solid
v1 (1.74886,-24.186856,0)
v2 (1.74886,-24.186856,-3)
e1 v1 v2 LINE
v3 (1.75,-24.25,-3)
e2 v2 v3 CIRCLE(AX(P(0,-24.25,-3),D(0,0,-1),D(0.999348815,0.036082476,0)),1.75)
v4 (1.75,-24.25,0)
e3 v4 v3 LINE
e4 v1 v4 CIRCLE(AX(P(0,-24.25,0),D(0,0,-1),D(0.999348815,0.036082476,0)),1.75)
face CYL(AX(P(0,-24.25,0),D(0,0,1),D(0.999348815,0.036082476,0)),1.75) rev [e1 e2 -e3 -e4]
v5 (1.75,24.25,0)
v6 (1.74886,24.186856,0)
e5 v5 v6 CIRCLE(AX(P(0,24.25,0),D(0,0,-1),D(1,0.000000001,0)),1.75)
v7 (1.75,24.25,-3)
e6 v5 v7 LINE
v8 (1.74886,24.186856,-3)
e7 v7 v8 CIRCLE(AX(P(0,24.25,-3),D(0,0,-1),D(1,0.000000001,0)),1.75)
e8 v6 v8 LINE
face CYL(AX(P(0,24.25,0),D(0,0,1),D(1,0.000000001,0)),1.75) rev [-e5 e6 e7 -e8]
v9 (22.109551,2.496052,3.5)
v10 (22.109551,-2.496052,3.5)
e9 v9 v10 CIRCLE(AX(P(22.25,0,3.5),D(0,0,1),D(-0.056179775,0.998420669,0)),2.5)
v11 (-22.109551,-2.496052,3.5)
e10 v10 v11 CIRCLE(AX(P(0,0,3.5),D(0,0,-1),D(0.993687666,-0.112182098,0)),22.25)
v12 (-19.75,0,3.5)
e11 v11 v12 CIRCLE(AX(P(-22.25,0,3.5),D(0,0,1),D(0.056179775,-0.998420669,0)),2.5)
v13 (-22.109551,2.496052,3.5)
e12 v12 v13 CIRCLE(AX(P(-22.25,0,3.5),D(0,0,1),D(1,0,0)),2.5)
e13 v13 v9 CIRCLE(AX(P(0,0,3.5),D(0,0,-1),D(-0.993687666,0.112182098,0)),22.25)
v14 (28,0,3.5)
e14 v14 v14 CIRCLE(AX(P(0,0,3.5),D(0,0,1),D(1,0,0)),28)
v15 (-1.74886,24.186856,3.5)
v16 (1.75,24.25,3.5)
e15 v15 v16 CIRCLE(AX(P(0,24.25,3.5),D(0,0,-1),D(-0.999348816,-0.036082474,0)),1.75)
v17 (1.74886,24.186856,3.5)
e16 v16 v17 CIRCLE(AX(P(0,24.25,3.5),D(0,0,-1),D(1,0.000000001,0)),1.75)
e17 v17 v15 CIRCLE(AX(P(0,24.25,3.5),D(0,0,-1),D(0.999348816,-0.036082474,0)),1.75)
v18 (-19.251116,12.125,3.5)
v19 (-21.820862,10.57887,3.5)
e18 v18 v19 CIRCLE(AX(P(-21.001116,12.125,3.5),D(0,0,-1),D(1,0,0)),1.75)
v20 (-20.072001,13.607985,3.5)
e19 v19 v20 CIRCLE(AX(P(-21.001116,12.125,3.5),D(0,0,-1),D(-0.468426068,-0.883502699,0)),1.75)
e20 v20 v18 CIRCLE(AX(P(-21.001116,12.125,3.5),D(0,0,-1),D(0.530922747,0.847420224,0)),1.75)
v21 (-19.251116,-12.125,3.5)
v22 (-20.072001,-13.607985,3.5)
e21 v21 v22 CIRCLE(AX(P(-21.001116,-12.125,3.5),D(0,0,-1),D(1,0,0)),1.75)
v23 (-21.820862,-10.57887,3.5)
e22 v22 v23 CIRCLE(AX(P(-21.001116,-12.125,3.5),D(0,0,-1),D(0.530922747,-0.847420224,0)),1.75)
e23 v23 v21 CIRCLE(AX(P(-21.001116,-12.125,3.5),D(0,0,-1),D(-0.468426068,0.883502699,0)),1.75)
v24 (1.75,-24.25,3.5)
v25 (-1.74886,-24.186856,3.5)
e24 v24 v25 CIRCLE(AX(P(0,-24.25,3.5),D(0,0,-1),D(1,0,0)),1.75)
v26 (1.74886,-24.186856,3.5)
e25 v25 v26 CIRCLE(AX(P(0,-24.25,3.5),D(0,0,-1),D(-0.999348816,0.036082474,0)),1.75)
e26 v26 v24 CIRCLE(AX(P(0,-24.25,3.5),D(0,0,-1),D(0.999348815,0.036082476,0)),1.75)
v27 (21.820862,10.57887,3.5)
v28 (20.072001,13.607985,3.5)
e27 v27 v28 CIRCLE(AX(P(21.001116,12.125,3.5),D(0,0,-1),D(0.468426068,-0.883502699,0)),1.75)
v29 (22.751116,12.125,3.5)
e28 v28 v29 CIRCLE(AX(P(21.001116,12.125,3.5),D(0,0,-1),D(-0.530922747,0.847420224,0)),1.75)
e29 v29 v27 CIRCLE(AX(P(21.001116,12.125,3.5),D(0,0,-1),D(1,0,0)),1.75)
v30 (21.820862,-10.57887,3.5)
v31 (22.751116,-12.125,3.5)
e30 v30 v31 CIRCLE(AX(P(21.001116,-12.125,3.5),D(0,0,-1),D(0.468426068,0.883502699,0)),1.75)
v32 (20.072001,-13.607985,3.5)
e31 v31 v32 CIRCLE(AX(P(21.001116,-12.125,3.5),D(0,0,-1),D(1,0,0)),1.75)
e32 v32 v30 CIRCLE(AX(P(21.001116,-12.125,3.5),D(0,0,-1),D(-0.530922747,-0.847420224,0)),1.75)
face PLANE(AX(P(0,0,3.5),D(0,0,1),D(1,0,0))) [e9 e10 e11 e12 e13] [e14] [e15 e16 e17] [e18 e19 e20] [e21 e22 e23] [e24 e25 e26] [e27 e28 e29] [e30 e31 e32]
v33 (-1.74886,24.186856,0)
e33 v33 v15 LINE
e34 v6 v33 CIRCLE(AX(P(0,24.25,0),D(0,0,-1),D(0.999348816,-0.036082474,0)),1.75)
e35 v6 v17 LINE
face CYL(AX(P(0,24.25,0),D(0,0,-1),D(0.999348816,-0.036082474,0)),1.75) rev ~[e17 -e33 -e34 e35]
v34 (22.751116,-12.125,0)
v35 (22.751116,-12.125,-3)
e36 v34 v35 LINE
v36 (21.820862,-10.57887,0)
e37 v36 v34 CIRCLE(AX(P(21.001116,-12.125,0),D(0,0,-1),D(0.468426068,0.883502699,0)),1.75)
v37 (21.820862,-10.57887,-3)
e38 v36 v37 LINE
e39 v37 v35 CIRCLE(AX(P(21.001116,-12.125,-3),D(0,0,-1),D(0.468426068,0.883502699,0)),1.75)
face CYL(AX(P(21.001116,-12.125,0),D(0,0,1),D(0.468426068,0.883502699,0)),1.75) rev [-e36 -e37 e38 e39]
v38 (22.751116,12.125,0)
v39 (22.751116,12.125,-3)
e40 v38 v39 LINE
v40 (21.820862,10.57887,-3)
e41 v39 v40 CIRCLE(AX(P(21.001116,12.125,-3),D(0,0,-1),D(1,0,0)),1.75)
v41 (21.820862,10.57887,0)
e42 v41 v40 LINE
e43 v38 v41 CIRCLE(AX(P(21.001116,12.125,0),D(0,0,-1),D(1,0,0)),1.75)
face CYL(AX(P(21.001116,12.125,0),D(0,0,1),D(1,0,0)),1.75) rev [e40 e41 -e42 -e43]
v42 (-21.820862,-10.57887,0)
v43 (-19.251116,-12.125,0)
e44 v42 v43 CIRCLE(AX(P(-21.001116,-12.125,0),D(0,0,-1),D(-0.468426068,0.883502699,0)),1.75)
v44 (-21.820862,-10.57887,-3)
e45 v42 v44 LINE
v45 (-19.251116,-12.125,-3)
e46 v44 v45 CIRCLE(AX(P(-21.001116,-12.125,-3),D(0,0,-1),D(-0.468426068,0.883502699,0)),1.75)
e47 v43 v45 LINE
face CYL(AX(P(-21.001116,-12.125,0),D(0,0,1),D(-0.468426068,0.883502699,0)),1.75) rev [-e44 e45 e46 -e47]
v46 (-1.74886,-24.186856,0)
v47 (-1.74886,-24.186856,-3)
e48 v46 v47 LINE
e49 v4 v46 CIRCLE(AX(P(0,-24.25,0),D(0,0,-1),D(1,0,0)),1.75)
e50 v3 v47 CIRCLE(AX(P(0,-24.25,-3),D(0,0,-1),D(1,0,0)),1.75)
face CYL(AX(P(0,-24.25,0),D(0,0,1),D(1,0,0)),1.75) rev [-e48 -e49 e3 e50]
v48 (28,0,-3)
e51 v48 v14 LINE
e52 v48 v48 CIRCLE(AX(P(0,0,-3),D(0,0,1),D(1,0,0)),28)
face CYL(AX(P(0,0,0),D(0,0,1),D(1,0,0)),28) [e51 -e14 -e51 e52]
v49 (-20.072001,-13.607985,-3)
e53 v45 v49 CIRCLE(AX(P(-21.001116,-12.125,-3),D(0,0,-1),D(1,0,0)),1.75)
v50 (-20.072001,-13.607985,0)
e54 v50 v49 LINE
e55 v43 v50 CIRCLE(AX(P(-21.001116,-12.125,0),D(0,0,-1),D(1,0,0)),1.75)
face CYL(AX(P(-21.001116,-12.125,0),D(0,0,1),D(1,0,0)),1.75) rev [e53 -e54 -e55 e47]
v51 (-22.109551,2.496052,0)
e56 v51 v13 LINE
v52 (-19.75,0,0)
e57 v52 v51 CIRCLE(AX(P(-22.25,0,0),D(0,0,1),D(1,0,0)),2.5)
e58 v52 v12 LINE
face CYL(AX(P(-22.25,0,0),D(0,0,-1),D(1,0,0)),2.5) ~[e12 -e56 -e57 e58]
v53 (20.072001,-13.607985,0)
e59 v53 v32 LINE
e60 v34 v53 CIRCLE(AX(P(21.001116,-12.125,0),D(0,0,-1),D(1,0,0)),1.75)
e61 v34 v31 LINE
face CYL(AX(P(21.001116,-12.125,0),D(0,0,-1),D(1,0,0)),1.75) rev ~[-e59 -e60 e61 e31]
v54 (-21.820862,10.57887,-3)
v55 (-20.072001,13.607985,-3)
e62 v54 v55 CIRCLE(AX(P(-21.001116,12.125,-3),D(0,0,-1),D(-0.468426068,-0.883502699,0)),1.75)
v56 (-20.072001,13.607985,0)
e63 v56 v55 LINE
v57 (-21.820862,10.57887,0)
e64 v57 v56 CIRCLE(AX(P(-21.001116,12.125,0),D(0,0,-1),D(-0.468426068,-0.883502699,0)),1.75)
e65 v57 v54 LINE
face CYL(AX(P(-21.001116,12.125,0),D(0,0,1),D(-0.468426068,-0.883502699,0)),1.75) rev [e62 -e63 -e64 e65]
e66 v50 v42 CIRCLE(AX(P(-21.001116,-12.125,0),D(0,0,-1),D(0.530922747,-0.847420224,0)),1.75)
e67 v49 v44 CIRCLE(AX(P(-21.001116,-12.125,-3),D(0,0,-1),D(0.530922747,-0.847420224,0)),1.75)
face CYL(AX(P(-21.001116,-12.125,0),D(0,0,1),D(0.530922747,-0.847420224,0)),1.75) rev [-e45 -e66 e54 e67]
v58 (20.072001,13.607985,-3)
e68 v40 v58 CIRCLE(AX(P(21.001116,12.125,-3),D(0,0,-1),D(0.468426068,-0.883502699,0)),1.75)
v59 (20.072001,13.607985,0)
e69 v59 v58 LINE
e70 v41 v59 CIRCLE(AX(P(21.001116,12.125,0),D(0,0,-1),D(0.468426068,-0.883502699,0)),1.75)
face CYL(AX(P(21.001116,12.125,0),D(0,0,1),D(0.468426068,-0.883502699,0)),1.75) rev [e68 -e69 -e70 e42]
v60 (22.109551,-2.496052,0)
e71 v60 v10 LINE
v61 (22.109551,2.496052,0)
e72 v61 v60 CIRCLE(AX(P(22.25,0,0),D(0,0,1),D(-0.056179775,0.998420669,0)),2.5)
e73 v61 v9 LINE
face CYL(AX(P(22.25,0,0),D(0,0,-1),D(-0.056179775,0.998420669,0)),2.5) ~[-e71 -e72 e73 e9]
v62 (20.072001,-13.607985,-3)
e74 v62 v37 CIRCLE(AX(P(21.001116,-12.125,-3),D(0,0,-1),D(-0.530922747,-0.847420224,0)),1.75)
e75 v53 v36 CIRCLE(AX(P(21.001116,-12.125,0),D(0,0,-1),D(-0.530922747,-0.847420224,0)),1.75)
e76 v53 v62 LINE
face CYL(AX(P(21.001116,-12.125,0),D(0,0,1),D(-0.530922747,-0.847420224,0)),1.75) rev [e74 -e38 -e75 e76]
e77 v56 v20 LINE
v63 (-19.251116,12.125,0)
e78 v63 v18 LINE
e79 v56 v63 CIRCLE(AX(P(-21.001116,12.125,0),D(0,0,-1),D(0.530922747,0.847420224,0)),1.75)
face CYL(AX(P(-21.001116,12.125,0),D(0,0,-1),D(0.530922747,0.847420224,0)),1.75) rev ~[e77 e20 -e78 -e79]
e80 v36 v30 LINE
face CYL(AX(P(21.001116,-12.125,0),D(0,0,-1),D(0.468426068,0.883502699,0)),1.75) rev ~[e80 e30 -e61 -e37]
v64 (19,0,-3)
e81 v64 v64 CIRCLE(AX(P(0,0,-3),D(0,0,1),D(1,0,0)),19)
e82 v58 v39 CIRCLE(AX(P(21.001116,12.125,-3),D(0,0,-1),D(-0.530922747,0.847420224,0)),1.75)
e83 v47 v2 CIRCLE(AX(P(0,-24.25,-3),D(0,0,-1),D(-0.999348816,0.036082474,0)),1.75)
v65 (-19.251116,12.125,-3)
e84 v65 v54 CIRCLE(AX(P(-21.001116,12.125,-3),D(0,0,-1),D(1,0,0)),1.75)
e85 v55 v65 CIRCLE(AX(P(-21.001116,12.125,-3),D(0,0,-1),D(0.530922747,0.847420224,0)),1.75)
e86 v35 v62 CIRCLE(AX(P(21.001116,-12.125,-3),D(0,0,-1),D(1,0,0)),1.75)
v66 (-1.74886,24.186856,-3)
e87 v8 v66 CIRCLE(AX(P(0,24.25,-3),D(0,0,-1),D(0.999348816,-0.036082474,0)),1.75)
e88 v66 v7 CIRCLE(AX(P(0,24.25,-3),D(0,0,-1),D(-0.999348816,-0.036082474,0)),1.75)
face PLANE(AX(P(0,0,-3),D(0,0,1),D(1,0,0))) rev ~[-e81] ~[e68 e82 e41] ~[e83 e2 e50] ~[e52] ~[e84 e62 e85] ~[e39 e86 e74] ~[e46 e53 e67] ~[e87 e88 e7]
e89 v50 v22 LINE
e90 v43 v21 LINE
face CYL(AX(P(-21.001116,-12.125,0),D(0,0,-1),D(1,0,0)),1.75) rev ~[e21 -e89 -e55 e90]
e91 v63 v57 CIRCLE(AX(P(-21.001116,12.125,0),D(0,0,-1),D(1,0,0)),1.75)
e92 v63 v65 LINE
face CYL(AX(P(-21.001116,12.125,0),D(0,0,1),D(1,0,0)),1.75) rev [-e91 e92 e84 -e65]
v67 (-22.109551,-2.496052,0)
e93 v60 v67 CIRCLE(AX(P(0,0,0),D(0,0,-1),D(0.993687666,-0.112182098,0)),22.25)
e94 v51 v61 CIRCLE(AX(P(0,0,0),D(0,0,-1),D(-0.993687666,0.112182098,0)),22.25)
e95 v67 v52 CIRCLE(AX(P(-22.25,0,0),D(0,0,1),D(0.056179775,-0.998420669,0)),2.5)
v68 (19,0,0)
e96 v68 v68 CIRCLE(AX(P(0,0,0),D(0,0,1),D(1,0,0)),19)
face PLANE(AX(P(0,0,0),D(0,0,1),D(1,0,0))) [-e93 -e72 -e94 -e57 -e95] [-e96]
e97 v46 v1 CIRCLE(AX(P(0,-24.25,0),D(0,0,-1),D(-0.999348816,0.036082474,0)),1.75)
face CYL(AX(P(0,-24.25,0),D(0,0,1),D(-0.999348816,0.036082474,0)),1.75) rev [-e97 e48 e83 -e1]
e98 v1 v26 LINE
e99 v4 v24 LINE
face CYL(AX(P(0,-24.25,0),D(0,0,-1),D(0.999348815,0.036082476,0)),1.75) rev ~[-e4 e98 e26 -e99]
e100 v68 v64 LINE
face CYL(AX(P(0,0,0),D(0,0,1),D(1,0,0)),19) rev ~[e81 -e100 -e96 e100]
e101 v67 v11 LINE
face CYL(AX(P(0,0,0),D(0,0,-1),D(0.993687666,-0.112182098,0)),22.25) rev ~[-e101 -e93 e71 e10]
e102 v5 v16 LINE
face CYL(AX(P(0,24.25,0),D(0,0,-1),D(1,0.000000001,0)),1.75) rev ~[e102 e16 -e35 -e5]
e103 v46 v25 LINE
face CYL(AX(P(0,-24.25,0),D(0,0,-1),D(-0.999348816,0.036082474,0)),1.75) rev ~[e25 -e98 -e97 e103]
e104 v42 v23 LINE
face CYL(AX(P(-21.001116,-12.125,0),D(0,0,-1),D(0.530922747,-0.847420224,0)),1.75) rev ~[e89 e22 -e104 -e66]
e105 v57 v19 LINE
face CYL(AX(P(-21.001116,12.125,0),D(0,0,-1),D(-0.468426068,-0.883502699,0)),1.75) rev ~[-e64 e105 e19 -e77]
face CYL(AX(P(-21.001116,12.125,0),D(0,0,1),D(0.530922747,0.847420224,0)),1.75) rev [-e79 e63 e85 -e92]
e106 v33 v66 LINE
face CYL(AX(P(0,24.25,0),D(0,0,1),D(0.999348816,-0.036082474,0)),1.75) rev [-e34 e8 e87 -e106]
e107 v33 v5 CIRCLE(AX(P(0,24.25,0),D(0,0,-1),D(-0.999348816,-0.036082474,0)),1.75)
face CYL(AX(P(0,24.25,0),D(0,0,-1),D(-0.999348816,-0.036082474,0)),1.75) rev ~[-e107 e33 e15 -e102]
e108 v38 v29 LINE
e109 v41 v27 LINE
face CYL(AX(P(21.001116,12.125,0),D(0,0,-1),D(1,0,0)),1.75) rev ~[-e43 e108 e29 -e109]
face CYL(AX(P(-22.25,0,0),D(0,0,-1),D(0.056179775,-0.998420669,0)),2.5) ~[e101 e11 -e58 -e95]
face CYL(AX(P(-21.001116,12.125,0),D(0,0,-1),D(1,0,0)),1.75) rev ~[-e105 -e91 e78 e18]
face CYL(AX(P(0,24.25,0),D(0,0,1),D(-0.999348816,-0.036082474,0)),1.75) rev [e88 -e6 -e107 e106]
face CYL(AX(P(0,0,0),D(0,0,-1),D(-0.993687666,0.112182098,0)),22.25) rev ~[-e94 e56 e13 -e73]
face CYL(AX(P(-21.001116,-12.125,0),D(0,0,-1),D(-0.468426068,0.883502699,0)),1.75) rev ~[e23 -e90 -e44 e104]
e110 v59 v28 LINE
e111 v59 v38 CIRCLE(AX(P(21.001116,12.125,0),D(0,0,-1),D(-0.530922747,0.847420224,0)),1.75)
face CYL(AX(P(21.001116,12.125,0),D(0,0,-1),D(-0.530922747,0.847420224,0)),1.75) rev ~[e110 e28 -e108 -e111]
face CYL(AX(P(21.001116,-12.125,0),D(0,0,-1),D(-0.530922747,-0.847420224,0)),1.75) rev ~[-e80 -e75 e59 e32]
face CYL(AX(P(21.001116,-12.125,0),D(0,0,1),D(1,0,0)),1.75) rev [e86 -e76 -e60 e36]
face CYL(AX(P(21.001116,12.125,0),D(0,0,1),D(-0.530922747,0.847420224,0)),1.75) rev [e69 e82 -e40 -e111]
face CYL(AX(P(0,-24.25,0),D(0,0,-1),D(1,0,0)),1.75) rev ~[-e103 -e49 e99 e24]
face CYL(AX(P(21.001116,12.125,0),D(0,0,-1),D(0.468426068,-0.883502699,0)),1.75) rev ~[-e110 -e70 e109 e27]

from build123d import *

# Parameters (mm, degrees)
F0_R     = 28
F1_DEPTH = 3.5
F0_R_2   = 19
F2_DEPTH = 3


with BuildPart() as f1:
    # F0 (on Top) → F1 (new body)
    with BuildSketch(Plane.XY):
        Circle(F0_R)
        with BuildLine():
            ThreePointArc((21.8208616615, 10.5788702775), (23.4473621908, 6.1873828305), (24.1994382022, 1.5651487775))
            ThreePointArc((24.1994382022, 1.5651487775), (24.6083464022, 0.8295795605), (24.75, 0))
            ThreePointArc((24.75, 0), (24.6083464022, -0.8295795605), (24.1994382022, -1.5651487775))
            ThreePointArc((24.1994382022, -1.5651487775), (23.4473621908, -6.1873828305), (21.8208616615, -10.5788702775))
            ThreePointArc((21.8208616615, -10.5788702775), (22.5006251005, -11.222795709), (22.7511160418, -12.125))
            ThreePointArc((22.7511160418, -12.125), (21.8486268344, -13.6560863648), (20.0720012344, -13.6079853926))
            ThreePointArc((20.0720012344, -13.6079853926), (12.125, -21.0011160418), (1.7488604271, -24.1868556701))
            ThreePointArc((1.7488604271, -24.1868556701), (1.7497150836, -24.218422694), (1.75, -24.25))
            ThreePointArc((1.75, -24.25), (-0.031577306, -25.9997150836), (-1.7488604271, -24.1868556701))
            ThreePointArc((-1.7488604271, -24.1868556701), (-12.125, -21.0011160418), (-20.0720012344, -13.6079853926))
            ThreePointArc((-20.0720012344, -13.6079853926), (-22.5166604984, -13), (-21.8208616615, -10.5788702775))
            ThreePointArc((-21.8208616615, -10.5788702775), (-23.4473621908, -6.1873828305), (-24.1994382022, -1.5651487775))
            ThreePointArc((-24.1994382022, -1.5651487775), (-24.75, 0), (-24.1994382022, 1.5651487775))
            ThreePointArc((-24.1994382022, 1.5651487775), (-23.4473621908, 6.1873828305), (-21.8208616615, 10.5788702775))
            ThreePointArc((-21.8208616615, 10.5788702775), (-22.5166604984, 13), (-20.0720012344, 13.6079853926))
            ThreePointArc((-20.0720012344, 13.6079853926), (-12.125, 21.0011160418), (-1.7488604271, 24.1868556701))
            ThreePointArc((-1.7488604271, 24.1868556701), (-0.031577306, 25.9997150836), (1.75, 24.25))
            ThreePointArc((1.75, 24.25), (1.7497150836, 24.218422694), (1.7488604271, 24.1868556701))
            ThreePointArc((1.7488604271, 24.1868556701), (12.125, 21.0011160418), (20.0720012344, 13.6079853926))
            ThreePointArc((20.0720012344, 13.6079853926), (21.8486268344, 13.6560863648), (22.7511160418, 12.125))
            ThreePointArc((22.7511160418, 12.125), (22.5006251005, 11.222795709), (21.8208616615, 10.5788702775))
        make_face(mode=Mode.SUBTRACT)
        with BuildLine():
            ThreePointArc((22.1095505618, 2.4960516732), (23.267229147, 2.2836910611), (24.1994382022, 1.5651487775))
            ThreePointArc((24.1994382022, 1.5651487775), (23.4473621908, 6.1873828305), (21.8208616615, 10.5788702775))
            ThreePointArc((21.8208616615, 10.5788702775), (19.4855715851, 11.25), (20.0720012344, 13.6079853926))
            ThreePointArc((20.0720012344, 13.6079853926), (12.125, 21.0011160418), (1.7488604271, 24.1868556701))
            ThreePointArc((1.7488604271, 24.1868556701), (0, 22.5), (-1.7488604271, 24.1868556701))
            ThreePointArc((-1.7488604271, 24.1868556701), (-12.125, 21.0011160418), (-20.0720012344, 13.6079853926))
            ThreePointArc((-20.0720012344, 13.6079853926), (-19.470029677, 12.9725107926), (-19.2511160418, 12.125))
            ThreePointArc((-19.2511160418, 12.125), (-20.0989117508, 10.6254909412), (-21.8208616615, 10.5788702775))
            ThreePointArc((-21.8208616615, 10.5788702775), (-23.4473621908, 6.1873828305), (-24.1994382022, 1.5651487775))
            ThreePointArc((-24.1994382022, 1.5651487775), (-23.267229147, 2.2836910611), (-22.1095505618, 2.4960516732))
            ThreePointArc((-22.1095505618, 2.4960516732), (0, 22.25), (22.1095505618, 2.4960516732))
        make_face()
        with BuildLine():
            ThreePointArc((21.8208616615, -10.5788702775), (23.4473621908, -6.1873828305), (24.1994382022, -1.5651487775))
            ThreePointArc((24.1994382022, -1.5651487775), (23.267229147, -2.2836910611), (22.1095505618, -2.4960516732))
            ThreePointArc((22.1095505618, -2.4960516732), (0, -22.25), (-22.1095505618, -2.4960516732))
            ThreePointArc((-22.1095505618, -2.4960516732), (-23.267229147, -2.2836910611), (-24.1994382022, -1.5651487775))
            ThreePointArc((-24.1994382022, -1.5651487775), (-23.4473621908, -6.1873828305), (-21.8208616615, -10.5788702775))
            ThreePointArc((-21.8208616615, -10.5788702775), (-20.0989117508, -10.6254909412), (-19.2511160418, -12.125))
            ThreePointArc((-19.2511160418, -12.125), (-19.470029677, -12.9725107926), (-20.0720012344, -13.6079853926))
            ThreePointArc((-20.0720012344, -13.6079853926), (-12.125, -21.0011160418), (-1.7488604271, -24.1868556701))
            ThreePointArc((-1.7488604271, -24.1868556701), (0, -22.5), (1.7488604271, -24.1868556701))
            ThreePointArc((1.7488604271, -24.1868556701), (12.125, -21.0011160418), (20.0720012344, -13.6079853926))
            ThreePointArc((20.0720012344, -13.6079853926), (19.4855715851, -11.25), (21.8208616615, -10.5788702775))
        make_face()
        with BuildLine():
            ThreePointArc((22.25, 0), (22.2148598915, 1.25), (22.1095505618, 2.4960516732))
            ThreePointArc((22.1095505618, 2.4960516732), (19.75, 0), (22.1095505618, -2.4960516732))
            ThreePointArc((22.1095505618, -2.4960516732), (22.2148598915, -1.25), (22.25, 0))
        make_face()
        with BuildLine():
            ThreePointArc((-19.75, 0), (-20.4332551644, 1.7173928503), (-22.1095505618, 2.4960516732))
            ThreePointArc((-22.1095505618, 2.4960516732), (-22.25, 0), (-22.1095505618, -2.4960516732))
            ThreePointArc((-22.1095505618, -2.4960516732), (-20.4332551644, -1.7173928503), (-19.75, 0))
        make_face()
        with BuildLine():
            ThreePointArc((24.1994382022, -1.5651487775), (24.2373562544, -0.7829826293), (24.25, 0))
            ThreePointArc((24.25, 0), (24.2373562544, 0.7829826293), (24.1994382022, 1.5651487775))
            ThreePointArc((24.1994382022, 1.5651487775), (23.267229147, 2.2836910611), (22.1095505618, 2.4960516732))
            ThreePointArc((22.1095505618, 2.4960516732), (22.2148598915, 1.25), (22.25, 0))
            ThreePointArc((22.25, 0), (22.2148598915, -1.25), (22.1095505618, -2.4960516732))
            ThreePointArc((22.1095505618, -2.4960516732), (23.267229147, -2.2836910611), (24.1994382022, -1.5651487775))
        make_face()
        with BuildLine():
            ThreePointArc((-22.1095505618, -2.4960516732), (-22.25, 0), (-22.1095505618, 2.4960516732))
            ThreePointArc((-22.1095505618, 2.4960516732), (-23.267229147, 2.2836910611), (-24.1994382022, 1.5651487775))
            ThreePointArc((-24.1994382022, 1.5651487775), (-24.25, 0), (-24.1994382022, -1.5651487775))
            ThreePointArc((-24.1994382022, -1.5651487775), (-23.267229147, -2.2836910611), (-22.1095505618, -2.4960516732))
        make_face()
        with BuildLine():
            ThreePointArc((24.1994382022, 1.5651487775), (24.2373562544, 0.7829826293), (24.25, 0))
            ThreePointArc((24.25, 0), (24.2373562544, -0.7829826293), (24.1994382022, -1.5651487775))
            ThreePointArc((24.1994382022, -1.5651487775), (24.6083464022, -0.8295795605), (24.75, 0))
            ThreePointArc((24.75, 0), (24.6083464022, 0.8295795605), (24.1994382022, 1.5651487775))
        make_face()
        with BuildLine():
            ThreePointArc((-24.1994382022, -1.5651487775), (-24.25, 0), (-24.1994382022, 1.5651487775))
            ThreePointArc((-24.1994382022, 1.5651487775), (-24.75, 0), (-24.1994382022, -1.5651487775))
        make_face()
    extrude(amount=F1_DEPTH)

    # F0 (on Top) → F2 (join)
    with BuildSketch(Plane.XY):
        Circle(F0_R)
        with BuildLine():
            ThreePointArc((21.8208616615, 10.5788702775), (23.4473621908, 6.1873828305), (24.1994382022, 1.5651487775))
            ThreePointArc((24.1994382022, 1.5651487775), (24.6083464022, 0.8295795605), (24.75, 0))
            ThreePointArc((24.75, 0), (24.6083464022, -0.8295795605), (24.1994382022, -1.5651487775))
            ThreePointArc((24.1994382022, -1.5651487775), (23.4473621908, -6.1873828305), (21.8208616615, -10.5788702775))
            ThreePointArc((21.8208616615, -10.5788702775), (22.5006251005, -11.222795709), (22.7511160418, -12.125))
            ThreePointArc((22.7511160418, -12.125), (21.8486268344, -13.6560863648), (20.0720012344, -13.6079853926))
            ThreePointArc((20.0720012344, -13.6079853926), (12.125, -21.0011160418), (1.7488604271, -24.1868556701))
            ThreePointArc((1.7488604271, -24.1868556701), (1.7497150836, -24.218422694), (1.75, -24.25))
            ThreePointArc((1.75, -24.25), (-0.031577306, -25.9997150836), (-1.7488604271, -24.1868556701))
            ThreePointArc((-1.7488604271, -24.1868556701), (-12.125, -21.0011160418), (-20.0720012344, -13.6079853926))
            ThreePointArc((-20.0720012344, -13.6079853926), (-22.5166604984, -13), (-21.8208616615, -10.5788702775))
            ThreePointArc((-21.8208616615, -10.5788702775), (-23.4473621908, -6.1873828305), (-24.1994382022, -1.5651487775))
            ThreePointArc((-24.1994382022, -1.5651487775), (-24.75, 0), (-24.1994382022, 1.5651487775))
            ThreePointArc((-24.1994382022, 1.5651487775), (-23.4473621908, 6.1873828305), (-21.8208616615, 10.5788702775))
            ThreePointArc((-21.8208616615, 10.5788702775), (-22.5166604984, 13), (-20.0720012344, 13.6079853926))
            ThreePointArc((-20.0720012344, 13.6079853926), (-12.125, 21.0011160418), (-1.7488604271, 24.1868556701))
            ThreePointArc((-1.7488604271, 24.1868556701), (-0.031577306, 25.9997150836), (1.75, 24.25))
            ThreePointArc((1.75, 24.25), (1.7497150836, 24.218422694), (1.7488604271, 24.1868556701))
            ThreePointArc((1.7488604271, 24.1868556701), (12.125, 21.0011160418), (20.0720012344, 13.6079853926))
            ThreePointArc((20.0720012344, 13.6079853926), (21.8486268344, 13.6560863648), (22.7511160418, 12.125))
            ThreePointArc((22.7511160418, 12.125), (22.5006251005, 11.222795709), (21.8208616615, 10.5788702775))
        make_face(mode=Mode.SUBTRACT)
        with BuildLine():
            ThreePointArc((22.1095505618, -2.4960516732), (19.75, 0), (22.1095505618, 2.4960516732))
            ThreePointArc((22.1095505618, 2.4960516732), (0, 22.25), (-22.1095505618, 2.4960516732))
            ThreePointArc((-22.1095505618, 2.4960516732), (-20.4332551644, 1.7173928503), (-19.75, 0))
            ThreePointArc((-19.75, 0), (-20.4332551644, -1.7173928503), (-22.1095505618, -2.4960516732))
            ThreePointArc((-22.1095505618, -2.4960516732), (0, -22.25), (22.1095505618, -2.4960516732))
        make_face()
        Circle(F0_R_2, mode=Mode.SUBTRACT)
        with BuildLine():
            ThreePointArc((22.1095505618, 2.4960516732), (23.267229147, 2.2836910611), (24.1994382022, 1.5651487775))
            ThreePointArc((24.1994382022, 1.5651487775), (23.4473621908, 6.1873828305), (21.8208616615, 10.5788702775))
            ThreePointArc((21.8208616615, 10.5788702775), (19.4855715851, 11.25), (20.0720012344, 13.6079853926))
            ThreePointArc((20.0720012344, 13.6079853926), (12.125, 21.0011160418), (1.7488604271, 24.1868556701))
            ThreePointArc((1.7488604271, 24.1868556701), (0, 22.5), (-1.7488604271, 24.1868556701))
            ThreePointArc((-1.7488604271, 24.1868556701), (-12.125, 21.0011160418), (-20.0720012344, 13.6079853926))
            ThreePointArc((-20.0720012344, 13.6079853926), (-19.470029677, 12.9725107926), (-19.2511160418, 12.125))
            ThreePointArc((-19.2511160418, 12.125), (-20.0989117508, 10.6254909412), (-21.8208616615, 10.5788702775))
            ThreePointArc((-21.8208616615, 10.5788702775), (-23.4473621908, 6.1873828305), (-24.1994382022, 1.5651487775))
            ThreePointArc((-24.1994382022, 1.5651487775), (-23.267229147, 2.2836910611), (-22.1095505618, 2.4960516732))
            ThreePointArc((-22.1095505618, 2.4960516732), (0, 22.25), (22.1095505618, 2.4960516732))
        make_face()
        with BuildLine():
            ThreePointArc((21.8208616615, -10.5788702775), (23.4473621908, -6.1873828305), (24.1994382022, -1.5651487775))
            ThreePointArc((24.1994382022, -1.5651487775), (23.267229147, -2.2836910611), (22.1095505618, -2.4960516732))
            ThreePointArc((22.1095505618, -2.4960516732), (0, -22.25), (-22.1095505618, -2.4960516732))
            ThreePointArc((-22.1095505618, -2.4960516732), (-23.267229147, -2.2836910611), (-24.1994382022, -1.5651487775))
            ThreePointArc((-24.1994382022, -1.5651487775), (-23.4473621908, -6.1873828305), (-21.8208616615, -10.5788702775))
            ThreePointArc((-21.8208616615, -10.5788702775), (-20.0989117508, -10.6254909412), (-19.2511160418, -12.125))
            ThreePointArc((-19.2511160418, -12.125), (-19.470029677, -12.9725107926), (-20.0720012344, -13.6079853926))
            ThreePointArc((-20.0720012344, -13.6079853926), (-12.125, -21.0011160418), (-1.7488604271, -24.1868556701))
            ThreePointArc((-1.7488604271, -24.1868556701), (0, -22.5), (1.7488604271, -24.1868556701))
            ThreePointArc((1.7488604271, -24.1868556701), (12.125, -21.0011160418), (20.0720012344, -13.6079853926))
            ThreePointArc((20.0720012344, -13.6079853926), (19.4855715851, -11.25), (21.8208616615, -10.5788702775))
        make_face()
        with BuildLine():
            ThreePointArc((22.25, 0), (22.2148598915, 1.25), (22.1095505618, 2.4960516732))
            ThreePointArc((22.1095505618, 2.4960516732), (19.75, 0), (22.1095505618, -2.4960516732))
            ThreePointArc((22.1095505618, -2.4960516732), (22.2148598915, -1.25), (22.25, 0))
        make_face()
        with BuildLine():
            ThreePointArc((-19.75, 0), (-20.4332551644, 1.7173928503), (-22.1095505618, 2.4960516732))
            ThreePointArc((-22.1095505618, 2.4960516732), (-22.25, 0), (-22.1095505618, -2.4960516732))
            ThreePointArc((-22.1095505618, -2.4960516732), (-20.4332551644, -1.7173928503), (-19.75, 0))
        make_face()
        with BuildLine():
            ThreePointArc((24.1994382022, -1.5651487775), (24.2373562544, -0.7829826293), (24.25, 0))
            ThreePointArc((24.25, 0), (24.2373562544, 0.7829826293), (24.1994382022, 1.5651487775))
            ThreePointArc((24.1994382022, 1.5651487775), (23.267229147, 2.2836910611), (22.1095505618, 2.4960516732))
            ThreePointArc((22.1095505618, 2.4960516732), (22.2148598915, 1.25), (22.25, 0))
            ThreePointArc((22.25, 0), (22.2148598915, -1.25), (22.1095505618, -2.4960516732))
            ThreePointArc((22.1095505618, -2.4960516732), (23.267229147, -2.2836910611), (24.1994382022, -1.5651487775))
        make_face()
        with BuildLine():
            ThreePointArc((-22.1095505618, -2.4960516732), (-22.25, 0), (-22.1095505618, 2.4960516732))
            ThreePointArc((-22.1095505618, 2.4960516732), (-23.267229147, 2.2836910611), (-24.1994382022, 1.5651487775))
            ThreePointArc((-24.1994382022, 1.5651487775), (-24.25, 0), (-24.1994382022, -1.5651487775))
            ThreePointArc((-24.1994382022, -1.5651487775), (-23.267229147, -2.2836910611), (-22.1095505618, -2.4960516732))
        make_face()
        with BuildLine():
            ThreePointArc((24.1994382022, 1.5651487775), (24.2373562544, 0.7829826293), (24.25, 0))
            ThreePointArc((24.25, 0), (24.2373562544, -0.7829826293), (24.1994382022, -1.5651487775))
            ThreePointArc((24.1994382022, -1.5651487775), (24.6083464022, -0.8295795605), (24.75, 0))
            ThreePointArc((24.75, 0), (24.6083464022, 0.8295795605), (24.1994382022, 1.5651487775))
        make_face()
        with BuildLine():
            ThreePointArc((-24.1994382022, -1.5651487775), (-24.25, 0), (-24.1994382022, 1.5651487775))
            ThreePointArc((-24.1994382022, 1.5651487775), (-24.75, 0), (-24.1994382022, -1.5651487775))
        make_face()
    extrude(amount=-F2_DEPTH)


solid = f1.part
